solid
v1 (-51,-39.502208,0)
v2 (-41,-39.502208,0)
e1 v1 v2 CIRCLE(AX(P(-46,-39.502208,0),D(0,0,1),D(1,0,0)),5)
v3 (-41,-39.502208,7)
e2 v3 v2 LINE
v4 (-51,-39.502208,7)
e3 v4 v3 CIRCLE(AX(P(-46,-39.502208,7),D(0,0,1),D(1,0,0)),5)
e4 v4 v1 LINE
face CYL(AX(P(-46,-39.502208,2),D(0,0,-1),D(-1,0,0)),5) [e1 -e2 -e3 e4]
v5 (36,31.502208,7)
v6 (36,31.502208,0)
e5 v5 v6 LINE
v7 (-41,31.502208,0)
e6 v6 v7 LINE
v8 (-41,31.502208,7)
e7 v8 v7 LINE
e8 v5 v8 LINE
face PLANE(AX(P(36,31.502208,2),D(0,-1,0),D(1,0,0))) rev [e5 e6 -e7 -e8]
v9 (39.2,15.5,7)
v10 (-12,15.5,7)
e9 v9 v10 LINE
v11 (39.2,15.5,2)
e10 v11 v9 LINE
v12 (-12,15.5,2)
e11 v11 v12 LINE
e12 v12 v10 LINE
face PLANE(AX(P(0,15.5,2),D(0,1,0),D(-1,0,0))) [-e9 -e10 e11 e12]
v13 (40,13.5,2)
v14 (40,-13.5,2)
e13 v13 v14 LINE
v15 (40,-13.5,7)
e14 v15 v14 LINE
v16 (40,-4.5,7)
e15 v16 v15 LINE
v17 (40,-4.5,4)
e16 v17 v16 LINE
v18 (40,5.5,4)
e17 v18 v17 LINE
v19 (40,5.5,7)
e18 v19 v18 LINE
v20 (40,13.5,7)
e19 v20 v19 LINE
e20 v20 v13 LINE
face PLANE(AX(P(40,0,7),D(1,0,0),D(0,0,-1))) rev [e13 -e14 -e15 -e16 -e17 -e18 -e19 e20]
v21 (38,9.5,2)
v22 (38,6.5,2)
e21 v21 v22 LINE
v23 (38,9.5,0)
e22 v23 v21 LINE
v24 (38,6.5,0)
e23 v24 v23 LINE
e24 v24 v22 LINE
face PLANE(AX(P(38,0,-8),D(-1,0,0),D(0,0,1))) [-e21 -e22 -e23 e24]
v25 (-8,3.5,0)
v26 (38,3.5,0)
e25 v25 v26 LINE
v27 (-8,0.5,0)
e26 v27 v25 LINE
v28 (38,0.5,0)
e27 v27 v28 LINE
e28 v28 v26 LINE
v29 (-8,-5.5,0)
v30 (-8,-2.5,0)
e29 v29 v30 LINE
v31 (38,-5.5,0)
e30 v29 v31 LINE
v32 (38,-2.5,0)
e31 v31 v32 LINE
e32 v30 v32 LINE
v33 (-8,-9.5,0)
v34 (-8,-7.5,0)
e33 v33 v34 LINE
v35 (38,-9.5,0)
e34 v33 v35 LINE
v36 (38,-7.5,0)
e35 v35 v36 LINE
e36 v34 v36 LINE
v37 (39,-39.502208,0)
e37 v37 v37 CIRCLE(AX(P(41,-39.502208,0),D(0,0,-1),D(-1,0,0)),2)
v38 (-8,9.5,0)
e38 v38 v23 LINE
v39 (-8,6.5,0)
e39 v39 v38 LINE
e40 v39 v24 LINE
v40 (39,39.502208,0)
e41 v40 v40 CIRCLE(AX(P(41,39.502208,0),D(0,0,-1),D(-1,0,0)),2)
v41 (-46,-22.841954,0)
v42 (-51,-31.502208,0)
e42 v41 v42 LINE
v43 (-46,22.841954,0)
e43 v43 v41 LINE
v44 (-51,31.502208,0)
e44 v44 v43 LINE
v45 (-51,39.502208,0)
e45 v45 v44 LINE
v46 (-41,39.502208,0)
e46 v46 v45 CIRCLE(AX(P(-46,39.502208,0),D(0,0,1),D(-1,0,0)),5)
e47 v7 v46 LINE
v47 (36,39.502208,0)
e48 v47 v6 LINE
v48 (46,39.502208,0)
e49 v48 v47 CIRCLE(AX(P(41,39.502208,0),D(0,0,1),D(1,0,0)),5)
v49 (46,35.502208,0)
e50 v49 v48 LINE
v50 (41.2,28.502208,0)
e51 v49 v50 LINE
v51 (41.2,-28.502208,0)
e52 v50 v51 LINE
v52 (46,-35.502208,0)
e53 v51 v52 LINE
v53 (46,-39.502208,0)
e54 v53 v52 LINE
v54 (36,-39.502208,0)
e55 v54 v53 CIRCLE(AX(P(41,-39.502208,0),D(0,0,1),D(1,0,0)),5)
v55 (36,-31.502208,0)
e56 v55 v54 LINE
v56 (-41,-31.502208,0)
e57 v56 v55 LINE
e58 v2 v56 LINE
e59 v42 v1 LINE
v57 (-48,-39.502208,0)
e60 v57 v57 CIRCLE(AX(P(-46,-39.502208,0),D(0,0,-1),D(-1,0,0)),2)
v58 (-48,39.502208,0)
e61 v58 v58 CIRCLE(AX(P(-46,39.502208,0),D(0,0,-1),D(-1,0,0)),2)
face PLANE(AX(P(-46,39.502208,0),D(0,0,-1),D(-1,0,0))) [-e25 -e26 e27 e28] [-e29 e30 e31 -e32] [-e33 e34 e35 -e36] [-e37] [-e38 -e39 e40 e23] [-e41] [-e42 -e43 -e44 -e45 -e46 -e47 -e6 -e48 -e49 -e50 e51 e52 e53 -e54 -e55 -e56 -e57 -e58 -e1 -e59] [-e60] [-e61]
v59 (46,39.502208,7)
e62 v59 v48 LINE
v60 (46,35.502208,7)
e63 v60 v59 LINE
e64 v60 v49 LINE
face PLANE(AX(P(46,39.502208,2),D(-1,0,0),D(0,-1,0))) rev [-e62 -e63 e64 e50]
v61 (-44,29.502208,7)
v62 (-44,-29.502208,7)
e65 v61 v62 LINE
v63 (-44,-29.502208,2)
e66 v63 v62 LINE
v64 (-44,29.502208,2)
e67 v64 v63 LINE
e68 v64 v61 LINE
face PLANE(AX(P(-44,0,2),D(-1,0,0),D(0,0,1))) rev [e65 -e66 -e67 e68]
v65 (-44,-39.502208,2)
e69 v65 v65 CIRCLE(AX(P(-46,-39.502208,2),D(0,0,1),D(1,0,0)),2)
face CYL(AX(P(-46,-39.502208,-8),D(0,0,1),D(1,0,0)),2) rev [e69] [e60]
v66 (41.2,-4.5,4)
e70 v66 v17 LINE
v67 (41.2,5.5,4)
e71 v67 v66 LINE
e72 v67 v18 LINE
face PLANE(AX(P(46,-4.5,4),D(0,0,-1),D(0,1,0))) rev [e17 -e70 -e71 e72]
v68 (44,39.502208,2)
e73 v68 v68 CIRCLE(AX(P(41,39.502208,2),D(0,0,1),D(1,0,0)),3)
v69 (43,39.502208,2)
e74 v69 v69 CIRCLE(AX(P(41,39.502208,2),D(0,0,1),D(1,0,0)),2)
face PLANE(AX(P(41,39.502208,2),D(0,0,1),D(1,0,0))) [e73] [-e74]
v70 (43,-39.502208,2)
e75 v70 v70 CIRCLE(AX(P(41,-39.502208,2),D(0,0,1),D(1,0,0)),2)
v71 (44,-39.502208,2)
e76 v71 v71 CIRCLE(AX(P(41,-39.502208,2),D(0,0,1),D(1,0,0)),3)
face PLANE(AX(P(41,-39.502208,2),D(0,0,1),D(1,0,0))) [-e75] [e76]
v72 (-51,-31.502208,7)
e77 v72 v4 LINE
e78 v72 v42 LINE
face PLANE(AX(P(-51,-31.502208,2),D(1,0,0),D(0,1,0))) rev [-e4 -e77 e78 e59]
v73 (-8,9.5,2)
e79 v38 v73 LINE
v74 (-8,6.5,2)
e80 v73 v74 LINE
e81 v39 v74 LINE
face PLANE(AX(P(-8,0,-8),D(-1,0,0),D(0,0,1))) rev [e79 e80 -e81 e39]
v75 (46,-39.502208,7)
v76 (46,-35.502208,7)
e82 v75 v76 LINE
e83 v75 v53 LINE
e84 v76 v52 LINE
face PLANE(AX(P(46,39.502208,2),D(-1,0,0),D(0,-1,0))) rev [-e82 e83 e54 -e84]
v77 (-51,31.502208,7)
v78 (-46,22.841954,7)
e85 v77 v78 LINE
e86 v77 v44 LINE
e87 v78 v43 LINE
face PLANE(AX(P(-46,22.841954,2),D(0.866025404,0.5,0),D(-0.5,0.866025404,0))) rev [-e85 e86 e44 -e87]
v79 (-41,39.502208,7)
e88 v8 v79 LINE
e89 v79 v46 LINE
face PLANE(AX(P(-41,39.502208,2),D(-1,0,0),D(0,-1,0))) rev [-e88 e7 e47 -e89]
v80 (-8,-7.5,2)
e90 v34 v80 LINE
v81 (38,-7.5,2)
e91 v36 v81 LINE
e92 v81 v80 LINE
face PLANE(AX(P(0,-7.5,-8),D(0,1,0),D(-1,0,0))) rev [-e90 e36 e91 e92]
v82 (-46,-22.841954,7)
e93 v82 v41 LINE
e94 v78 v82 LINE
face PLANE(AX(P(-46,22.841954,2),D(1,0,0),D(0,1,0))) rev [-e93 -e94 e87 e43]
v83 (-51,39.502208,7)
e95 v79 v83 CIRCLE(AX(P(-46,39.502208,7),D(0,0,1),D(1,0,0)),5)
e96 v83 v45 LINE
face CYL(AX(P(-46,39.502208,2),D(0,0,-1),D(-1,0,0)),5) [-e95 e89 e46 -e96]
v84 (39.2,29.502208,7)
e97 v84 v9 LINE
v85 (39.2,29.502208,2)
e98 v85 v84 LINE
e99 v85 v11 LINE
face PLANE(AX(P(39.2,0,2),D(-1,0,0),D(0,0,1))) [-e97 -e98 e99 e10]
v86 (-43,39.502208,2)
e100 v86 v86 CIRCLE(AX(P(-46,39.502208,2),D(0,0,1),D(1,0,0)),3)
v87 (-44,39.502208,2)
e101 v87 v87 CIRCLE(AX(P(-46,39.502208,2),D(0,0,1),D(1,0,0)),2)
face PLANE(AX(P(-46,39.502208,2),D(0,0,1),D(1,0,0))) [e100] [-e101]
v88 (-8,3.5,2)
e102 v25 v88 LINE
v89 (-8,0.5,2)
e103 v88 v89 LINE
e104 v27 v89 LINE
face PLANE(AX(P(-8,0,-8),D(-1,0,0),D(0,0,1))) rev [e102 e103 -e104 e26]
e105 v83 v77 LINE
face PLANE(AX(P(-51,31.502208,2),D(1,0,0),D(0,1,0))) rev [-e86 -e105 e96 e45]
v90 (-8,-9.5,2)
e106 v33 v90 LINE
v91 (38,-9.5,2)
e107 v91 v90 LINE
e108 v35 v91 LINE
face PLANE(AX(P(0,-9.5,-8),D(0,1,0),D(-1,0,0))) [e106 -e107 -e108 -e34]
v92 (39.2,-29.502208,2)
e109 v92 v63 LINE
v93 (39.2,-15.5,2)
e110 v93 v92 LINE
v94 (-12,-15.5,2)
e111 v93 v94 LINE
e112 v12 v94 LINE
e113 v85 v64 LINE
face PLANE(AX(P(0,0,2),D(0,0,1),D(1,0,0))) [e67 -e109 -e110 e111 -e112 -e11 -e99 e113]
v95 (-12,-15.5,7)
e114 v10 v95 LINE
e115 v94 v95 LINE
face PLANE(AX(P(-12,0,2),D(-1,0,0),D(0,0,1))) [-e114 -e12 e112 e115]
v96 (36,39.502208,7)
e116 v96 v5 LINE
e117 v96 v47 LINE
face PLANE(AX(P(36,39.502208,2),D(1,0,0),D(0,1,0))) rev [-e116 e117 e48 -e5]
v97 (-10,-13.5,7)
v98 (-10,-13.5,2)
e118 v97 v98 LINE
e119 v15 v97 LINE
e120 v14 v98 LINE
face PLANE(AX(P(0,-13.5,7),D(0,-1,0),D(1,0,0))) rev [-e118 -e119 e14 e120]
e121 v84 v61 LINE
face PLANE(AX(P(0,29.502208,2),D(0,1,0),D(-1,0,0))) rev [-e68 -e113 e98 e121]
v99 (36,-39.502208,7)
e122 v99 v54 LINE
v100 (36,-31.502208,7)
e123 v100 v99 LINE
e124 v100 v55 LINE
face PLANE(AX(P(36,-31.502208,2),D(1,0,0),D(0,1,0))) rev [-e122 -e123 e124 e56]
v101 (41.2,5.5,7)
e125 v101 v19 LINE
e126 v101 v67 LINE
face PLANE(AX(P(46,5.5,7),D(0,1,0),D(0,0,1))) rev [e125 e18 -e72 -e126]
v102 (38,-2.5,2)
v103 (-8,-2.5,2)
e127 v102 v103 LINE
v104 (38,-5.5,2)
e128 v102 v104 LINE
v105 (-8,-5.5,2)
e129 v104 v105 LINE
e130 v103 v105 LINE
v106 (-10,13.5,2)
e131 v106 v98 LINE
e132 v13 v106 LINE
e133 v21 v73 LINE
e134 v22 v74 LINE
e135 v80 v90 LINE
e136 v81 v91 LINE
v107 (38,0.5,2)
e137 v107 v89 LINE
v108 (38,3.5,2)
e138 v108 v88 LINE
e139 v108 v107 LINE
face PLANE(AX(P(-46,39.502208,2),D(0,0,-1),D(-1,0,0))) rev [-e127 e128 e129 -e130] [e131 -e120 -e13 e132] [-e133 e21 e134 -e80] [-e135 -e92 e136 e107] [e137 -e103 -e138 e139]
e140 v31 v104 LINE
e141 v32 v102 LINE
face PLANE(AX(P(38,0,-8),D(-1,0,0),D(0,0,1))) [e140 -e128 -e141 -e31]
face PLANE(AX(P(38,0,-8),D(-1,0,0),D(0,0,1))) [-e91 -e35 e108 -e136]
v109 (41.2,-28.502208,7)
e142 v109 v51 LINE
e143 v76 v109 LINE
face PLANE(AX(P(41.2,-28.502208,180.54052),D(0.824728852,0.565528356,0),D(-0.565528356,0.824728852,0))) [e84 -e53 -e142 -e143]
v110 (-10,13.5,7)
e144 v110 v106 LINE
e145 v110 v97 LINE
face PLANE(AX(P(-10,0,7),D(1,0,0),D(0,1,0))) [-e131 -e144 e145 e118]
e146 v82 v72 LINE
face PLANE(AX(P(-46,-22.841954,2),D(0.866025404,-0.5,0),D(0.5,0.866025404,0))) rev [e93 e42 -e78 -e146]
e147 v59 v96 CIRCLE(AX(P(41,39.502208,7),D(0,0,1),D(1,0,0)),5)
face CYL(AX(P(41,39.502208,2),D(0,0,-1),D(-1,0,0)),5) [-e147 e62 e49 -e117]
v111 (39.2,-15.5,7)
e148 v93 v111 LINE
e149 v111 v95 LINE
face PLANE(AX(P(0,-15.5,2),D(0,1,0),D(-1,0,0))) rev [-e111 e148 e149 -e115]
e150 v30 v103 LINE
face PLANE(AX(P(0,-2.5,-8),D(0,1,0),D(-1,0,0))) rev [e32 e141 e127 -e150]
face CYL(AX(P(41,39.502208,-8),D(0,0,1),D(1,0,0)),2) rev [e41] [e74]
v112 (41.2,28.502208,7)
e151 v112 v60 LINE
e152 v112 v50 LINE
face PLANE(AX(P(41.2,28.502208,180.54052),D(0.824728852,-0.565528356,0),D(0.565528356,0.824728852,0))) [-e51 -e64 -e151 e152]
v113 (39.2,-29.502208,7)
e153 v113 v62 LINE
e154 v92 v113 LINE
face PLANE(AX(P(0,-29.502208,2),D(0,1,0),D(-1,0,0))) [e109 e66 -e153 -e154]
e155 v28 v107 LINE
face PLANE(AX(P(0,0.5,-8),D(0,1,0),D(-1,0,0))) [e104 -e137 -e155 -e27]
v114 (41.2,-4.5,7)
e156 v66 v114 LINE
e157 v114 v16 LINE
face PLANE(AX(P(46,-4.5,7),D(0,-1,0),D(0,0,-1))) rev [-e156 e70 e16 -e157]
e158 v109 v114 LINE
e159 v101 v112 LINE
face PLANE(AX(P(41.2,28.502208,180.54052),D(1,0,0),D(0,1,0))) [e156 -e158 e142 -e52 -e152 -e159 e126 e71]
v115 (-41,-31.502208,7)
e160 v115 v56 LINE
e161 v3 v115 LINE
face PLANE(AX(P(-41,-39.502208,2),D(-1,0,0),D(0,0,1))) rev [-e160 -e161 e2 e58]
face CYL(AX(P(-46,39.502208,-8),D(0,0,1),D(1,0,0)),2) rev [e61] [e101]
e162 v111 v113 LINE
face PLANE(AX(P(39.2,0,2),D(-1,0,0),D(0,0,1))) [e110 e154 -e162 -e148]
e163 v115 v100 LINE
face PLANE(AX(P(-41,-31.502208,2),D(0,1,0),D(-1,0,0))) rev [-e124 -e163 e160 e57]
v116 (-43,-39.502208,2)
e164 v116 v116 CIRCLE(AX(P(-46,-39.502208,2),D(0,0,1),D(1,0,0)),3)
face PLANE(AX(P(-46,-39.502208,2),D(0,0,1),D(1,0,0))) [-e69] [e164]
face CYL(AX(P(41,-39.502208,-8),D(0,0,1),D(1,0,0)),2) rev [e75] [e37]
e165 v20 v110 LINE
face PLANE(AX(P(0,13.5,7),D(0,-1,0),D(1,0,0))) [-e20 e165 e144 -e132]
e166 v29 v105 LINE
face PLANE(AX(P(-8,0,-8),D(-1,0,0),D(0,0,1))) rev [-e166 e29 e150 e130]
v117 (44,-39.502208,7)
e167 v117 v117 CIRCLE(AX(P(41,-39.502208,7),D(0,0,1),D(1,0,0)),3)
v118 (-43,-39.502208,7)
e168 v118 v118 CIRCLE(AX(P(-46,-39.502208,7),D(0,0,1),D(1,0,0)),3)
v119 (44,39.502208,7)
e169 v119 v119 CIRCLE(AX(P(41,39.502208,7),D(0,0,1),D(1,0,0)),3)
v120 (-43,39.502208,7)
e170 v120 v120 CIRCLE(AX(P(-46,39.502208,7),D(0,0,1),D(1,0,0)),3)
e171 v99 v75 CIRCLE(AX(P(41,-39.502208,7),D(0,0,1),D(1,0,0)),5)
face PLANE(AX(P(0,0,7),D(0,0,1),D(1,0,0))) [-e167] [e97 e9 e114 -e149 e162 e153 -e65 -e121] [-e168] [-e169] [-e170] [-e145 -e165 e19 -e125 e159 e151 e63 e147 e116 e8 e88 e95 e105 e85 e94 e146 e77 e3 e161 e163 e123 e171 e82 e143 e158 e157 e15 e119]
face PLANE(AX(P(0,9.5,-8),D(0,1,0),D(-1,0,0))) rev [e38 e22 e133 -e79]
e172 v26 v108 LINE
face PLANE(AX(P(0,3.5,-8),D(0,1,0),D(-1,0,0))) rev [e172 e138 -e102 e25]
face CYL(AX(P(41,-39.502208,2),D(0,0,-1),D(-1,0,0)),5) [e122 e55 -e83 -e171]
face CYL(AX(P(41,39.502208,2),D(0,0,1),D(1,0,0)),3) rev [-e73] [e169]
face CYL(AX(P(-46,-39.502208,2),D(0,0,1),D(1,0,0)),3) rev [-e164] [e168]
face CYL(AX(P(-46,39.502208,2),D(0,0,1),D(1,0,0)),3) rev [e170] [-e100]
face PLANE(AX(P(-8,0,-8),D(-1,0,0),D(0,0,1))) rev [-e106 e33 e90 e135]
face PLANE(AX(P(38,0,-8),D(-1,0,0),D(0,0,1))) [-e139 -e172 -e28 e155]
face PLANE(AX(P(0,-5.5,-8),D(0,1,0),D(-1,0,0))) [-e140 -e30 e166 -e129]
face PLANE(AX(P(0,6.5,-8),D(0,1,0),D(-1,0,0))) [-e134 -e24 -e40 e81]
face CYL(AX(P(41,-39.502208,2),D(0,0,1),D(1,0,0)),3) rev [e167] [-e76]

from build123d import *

# Parameters (mm, degrees)
EXTRUDE_1_DEPTH     = 2
SKETCH_3_W          = 50
SKETCH_3_H          = 27
EXTRUDE_2_DEPTH     = 5
SKETCH_5_R          = 3
CUT_EXTRUDE_1_DEPTH = 5
SKETCH_6_W          = 3
SKETCH_6_H          = 10
CUT_EXTRUDE_2_DEPTH = 102.540368708
CUT_EXTRUDE_START   = -7
CUT_EXTRUDE_5_DEPTH = 7
SKETCH_9_W          = 83.2
SKETCH_9_H          = 14.002207555
SKETCH_9_W_2        = 32
SKETCH_9_H_2        = 31
CUT_EXTRUDE_6_DEPTH = 5
SKETCH_11_W         = 46
SKETCH_11_H         = 3
SKETCH_11_H_2       = 2
CUT_EXTRUDE_8_DEPTH = 10
SKETCH_14_R         = 2
CUT_EXTRUDE_9_DEPTH = 10


# Read off the part's stored shape, not the designer's step: the extrude step
with BuildPart() as part:
    # 草图1 → 凸台-拉伸1 (new body)
    with BuildSketch(Plane.XY):
        with BuildLine():
            Line((-46, 22.841953517), (-46, -22.841953517))
            Line((-46, -22.841953517), (-51, -31.502207555))
            Line((-51, -31.502207555), (-51, -39.502207555))
            ThreePointArc((-51, -39.502207555), (-46, -44.502207555), (-41, -39.502207555))
            Line((-41, -39.502207555), (-41, -31.502207555))
            Line((-41, -31.502207555), (36, -31.502207555))
            Line((36, -31.502207555), (36, -39.502207555))
            ThreePointArc((36, -39.502207555), (41, -44.502207555), (46, -39.502207555))
            Line((46, -39.502207555), (46, 39.502207555))
            ThreePointArc((46, 39.502207555), (41, 44.502207555), (36, 39.502207555))
            Line((36, 39.502207555), (36, 31.502207555))
            Line((36, 31.502207555), (-41, 31.502207555))
            Line((-41, 31.502207555), (-41, 39.502207555))
            ThreePointArc((-41, 39.502207555), (-46, 44.502207555), (-51, 39.502207555))
            Line((-51, 39.502207555), (-51, 31.502207555))
            Line((-51, 31.502207555), (-46, 22.841953517))
        make_face()
    extrude(amount=EXTRUDE_1_DEPTH)

    # 草图3 → 凸台-拉伸2 (add)
    with BuildSketch(Plane.XY.offset(2)):
        with BuildLine():
            Line((-51, 39.502207555), (-51, 31.502207555))
            Line((-51, 31.502207555), (-46, 22.841953517))
            Line((-46, 22.841953517), (-46, -22.841953517))
            Line((-46, -22.841953517), (-51, -31.502207555))
            Line((-51, -31.502207555), (-51, -39.502207555))
            ThreePointArc((-51, -39.502207555), (-46, -44.502207555), (-41, -39.502207555))
            Line((-41, -39.502207555), (-41, -31.502207555))
            Line((-41, -31.502207555), (36, -31.502207555))
            Line((36, -31.502207555), (36, -39.502207555))
            ThreePointArc((36, -39.502207555), (41, -44.502207555), (46, -39.502207555))
            Line((46, -39.502207555), (46, 39.502207555))
            ThreePointArc((46, 39.502207555), (41, 44.502207555), (36, 39.502207555))
            Line((36, 39.502207555), (36, 31.502207555))
            Line((36, 31.502207555), (-41, 31.502207555))
            Line((-41, 31.502207555), (-41, 39.502207555))
            ThreePointArc((-41, 39.502207555), (-46, 44.502207555), (-51, 39.502207555))
        make_face()
        with Locations((15, 0)):
            Rectangle(SKETCH_3_W, SKETCH_3_H, mode=Mode.SUBTRACT)
    extrude(amount=EXTRUDE_2_DEPTH)

    # 草图5 → 切除-拉伸1 (cut)
    with BuildSketch(Plane.XY.offset(7)):
        with Locations((41, 39.502207555)):
            Circle(SKETCH_5_R)
        with Locations((-46, 39.502207555)):
            Circle(SKETCH_5_R)
        with Locations((41, -39.502207555)):
            Circle(SKETCH_5_R)
        with Locations((-46, -39.502207555)):
            Circle(SKETCH_5_R)
    extrude(amount=-CUT_EXTRUDE_1_DEPTH, mode=Mode.SUBTRACT)

    # 草图6 → 切除-拉伸2 (cut, through all)
    with BuildSketch(Plane.ZY.offset(-40)):
        with Locations((5.5, 0.5)):
            Rectangle(SKETCH_6_W, SKETCH_6_H)
    extrude(amount=-CUT_EXTRUDE_2_DEPTH, mode=Mode.SUBTRACT)

    # 切除-拉伸5 outline → 切除-拉伸5 (cut)
    with BuildSketch(Plane.XY.offset(7).offset(CUT_EXTRUDE_START)):
        Polygon((46, 35.502207555), (41.2, 28.502207555), (41.2, -28.502207555), (46, -35.502207555), align=None)
    extrude(amount=CUT_EXTRUDE_5_DEPTH, mode=Mode.SUBTRACT)

    # 草图9 → 切除-拉伸6 (cut)
    with BuildSketch(Plane.XY.offset(7)):
        with Locations((-2.4, 22.501103778)):
            Rectangle(SKETCH_9_W, SKETCH_9_H)
        with Locations((-2.4, -22.501103778)):
            Rectangle(SKETCH_9_W, SKETCH_9_H)
        with Locations((-28, 0)):
            Rectangle(SKETCH_9_W_2, SKETCH_9_H_2)
    extrude(amount=-CUT_EXTRUDE_6_DEPTH, mode=Mode.SUBTRACT)

    # 草图11 → 切除-拉伸8 (cut)
    with BuildSketch(Plane.XY.offset(2)):
        with Locations((15, 8)):
            Rectangle(SKETCH_11_W, SKETCH_11_H)
        with Locations((15, 2)):
            Rectangle(SKETCH_11_W, SKETCH_11_H)
        with Locations((15, -4)):
            Rectangle(SKETCH_11_W, SKETCH_11_H)
        with Locations((15, -8.5)):
            Rectangle(SKETCH_11_W, SKETCH_11_H_2)
    extrude(amount=-CUT_EXTRUDE_8_DEPTH, mode=Mode.SUBTRACT)

    # 草图14 → 切除-拉伸9 (cut)
    with BuildSketch(Plane.XY.offset(2)):
        with Locations((41, -39.502207555)):
            Circle(SKETCH_14_R)
        with Locations((41, 39.502207555)):
            Circle(SKETCH_14_R)
        with Locations((-46, 39.502207555)):
            Circle(SKETCH_14_R)
        with Locations((-46, -39.502207555)):
            Circle(SKETCH_14_R)
    extrude(amount=-CUT_EXTRUDE_9_DEPTH, mode=Mode.SUBTRACT)


solid = part.part
